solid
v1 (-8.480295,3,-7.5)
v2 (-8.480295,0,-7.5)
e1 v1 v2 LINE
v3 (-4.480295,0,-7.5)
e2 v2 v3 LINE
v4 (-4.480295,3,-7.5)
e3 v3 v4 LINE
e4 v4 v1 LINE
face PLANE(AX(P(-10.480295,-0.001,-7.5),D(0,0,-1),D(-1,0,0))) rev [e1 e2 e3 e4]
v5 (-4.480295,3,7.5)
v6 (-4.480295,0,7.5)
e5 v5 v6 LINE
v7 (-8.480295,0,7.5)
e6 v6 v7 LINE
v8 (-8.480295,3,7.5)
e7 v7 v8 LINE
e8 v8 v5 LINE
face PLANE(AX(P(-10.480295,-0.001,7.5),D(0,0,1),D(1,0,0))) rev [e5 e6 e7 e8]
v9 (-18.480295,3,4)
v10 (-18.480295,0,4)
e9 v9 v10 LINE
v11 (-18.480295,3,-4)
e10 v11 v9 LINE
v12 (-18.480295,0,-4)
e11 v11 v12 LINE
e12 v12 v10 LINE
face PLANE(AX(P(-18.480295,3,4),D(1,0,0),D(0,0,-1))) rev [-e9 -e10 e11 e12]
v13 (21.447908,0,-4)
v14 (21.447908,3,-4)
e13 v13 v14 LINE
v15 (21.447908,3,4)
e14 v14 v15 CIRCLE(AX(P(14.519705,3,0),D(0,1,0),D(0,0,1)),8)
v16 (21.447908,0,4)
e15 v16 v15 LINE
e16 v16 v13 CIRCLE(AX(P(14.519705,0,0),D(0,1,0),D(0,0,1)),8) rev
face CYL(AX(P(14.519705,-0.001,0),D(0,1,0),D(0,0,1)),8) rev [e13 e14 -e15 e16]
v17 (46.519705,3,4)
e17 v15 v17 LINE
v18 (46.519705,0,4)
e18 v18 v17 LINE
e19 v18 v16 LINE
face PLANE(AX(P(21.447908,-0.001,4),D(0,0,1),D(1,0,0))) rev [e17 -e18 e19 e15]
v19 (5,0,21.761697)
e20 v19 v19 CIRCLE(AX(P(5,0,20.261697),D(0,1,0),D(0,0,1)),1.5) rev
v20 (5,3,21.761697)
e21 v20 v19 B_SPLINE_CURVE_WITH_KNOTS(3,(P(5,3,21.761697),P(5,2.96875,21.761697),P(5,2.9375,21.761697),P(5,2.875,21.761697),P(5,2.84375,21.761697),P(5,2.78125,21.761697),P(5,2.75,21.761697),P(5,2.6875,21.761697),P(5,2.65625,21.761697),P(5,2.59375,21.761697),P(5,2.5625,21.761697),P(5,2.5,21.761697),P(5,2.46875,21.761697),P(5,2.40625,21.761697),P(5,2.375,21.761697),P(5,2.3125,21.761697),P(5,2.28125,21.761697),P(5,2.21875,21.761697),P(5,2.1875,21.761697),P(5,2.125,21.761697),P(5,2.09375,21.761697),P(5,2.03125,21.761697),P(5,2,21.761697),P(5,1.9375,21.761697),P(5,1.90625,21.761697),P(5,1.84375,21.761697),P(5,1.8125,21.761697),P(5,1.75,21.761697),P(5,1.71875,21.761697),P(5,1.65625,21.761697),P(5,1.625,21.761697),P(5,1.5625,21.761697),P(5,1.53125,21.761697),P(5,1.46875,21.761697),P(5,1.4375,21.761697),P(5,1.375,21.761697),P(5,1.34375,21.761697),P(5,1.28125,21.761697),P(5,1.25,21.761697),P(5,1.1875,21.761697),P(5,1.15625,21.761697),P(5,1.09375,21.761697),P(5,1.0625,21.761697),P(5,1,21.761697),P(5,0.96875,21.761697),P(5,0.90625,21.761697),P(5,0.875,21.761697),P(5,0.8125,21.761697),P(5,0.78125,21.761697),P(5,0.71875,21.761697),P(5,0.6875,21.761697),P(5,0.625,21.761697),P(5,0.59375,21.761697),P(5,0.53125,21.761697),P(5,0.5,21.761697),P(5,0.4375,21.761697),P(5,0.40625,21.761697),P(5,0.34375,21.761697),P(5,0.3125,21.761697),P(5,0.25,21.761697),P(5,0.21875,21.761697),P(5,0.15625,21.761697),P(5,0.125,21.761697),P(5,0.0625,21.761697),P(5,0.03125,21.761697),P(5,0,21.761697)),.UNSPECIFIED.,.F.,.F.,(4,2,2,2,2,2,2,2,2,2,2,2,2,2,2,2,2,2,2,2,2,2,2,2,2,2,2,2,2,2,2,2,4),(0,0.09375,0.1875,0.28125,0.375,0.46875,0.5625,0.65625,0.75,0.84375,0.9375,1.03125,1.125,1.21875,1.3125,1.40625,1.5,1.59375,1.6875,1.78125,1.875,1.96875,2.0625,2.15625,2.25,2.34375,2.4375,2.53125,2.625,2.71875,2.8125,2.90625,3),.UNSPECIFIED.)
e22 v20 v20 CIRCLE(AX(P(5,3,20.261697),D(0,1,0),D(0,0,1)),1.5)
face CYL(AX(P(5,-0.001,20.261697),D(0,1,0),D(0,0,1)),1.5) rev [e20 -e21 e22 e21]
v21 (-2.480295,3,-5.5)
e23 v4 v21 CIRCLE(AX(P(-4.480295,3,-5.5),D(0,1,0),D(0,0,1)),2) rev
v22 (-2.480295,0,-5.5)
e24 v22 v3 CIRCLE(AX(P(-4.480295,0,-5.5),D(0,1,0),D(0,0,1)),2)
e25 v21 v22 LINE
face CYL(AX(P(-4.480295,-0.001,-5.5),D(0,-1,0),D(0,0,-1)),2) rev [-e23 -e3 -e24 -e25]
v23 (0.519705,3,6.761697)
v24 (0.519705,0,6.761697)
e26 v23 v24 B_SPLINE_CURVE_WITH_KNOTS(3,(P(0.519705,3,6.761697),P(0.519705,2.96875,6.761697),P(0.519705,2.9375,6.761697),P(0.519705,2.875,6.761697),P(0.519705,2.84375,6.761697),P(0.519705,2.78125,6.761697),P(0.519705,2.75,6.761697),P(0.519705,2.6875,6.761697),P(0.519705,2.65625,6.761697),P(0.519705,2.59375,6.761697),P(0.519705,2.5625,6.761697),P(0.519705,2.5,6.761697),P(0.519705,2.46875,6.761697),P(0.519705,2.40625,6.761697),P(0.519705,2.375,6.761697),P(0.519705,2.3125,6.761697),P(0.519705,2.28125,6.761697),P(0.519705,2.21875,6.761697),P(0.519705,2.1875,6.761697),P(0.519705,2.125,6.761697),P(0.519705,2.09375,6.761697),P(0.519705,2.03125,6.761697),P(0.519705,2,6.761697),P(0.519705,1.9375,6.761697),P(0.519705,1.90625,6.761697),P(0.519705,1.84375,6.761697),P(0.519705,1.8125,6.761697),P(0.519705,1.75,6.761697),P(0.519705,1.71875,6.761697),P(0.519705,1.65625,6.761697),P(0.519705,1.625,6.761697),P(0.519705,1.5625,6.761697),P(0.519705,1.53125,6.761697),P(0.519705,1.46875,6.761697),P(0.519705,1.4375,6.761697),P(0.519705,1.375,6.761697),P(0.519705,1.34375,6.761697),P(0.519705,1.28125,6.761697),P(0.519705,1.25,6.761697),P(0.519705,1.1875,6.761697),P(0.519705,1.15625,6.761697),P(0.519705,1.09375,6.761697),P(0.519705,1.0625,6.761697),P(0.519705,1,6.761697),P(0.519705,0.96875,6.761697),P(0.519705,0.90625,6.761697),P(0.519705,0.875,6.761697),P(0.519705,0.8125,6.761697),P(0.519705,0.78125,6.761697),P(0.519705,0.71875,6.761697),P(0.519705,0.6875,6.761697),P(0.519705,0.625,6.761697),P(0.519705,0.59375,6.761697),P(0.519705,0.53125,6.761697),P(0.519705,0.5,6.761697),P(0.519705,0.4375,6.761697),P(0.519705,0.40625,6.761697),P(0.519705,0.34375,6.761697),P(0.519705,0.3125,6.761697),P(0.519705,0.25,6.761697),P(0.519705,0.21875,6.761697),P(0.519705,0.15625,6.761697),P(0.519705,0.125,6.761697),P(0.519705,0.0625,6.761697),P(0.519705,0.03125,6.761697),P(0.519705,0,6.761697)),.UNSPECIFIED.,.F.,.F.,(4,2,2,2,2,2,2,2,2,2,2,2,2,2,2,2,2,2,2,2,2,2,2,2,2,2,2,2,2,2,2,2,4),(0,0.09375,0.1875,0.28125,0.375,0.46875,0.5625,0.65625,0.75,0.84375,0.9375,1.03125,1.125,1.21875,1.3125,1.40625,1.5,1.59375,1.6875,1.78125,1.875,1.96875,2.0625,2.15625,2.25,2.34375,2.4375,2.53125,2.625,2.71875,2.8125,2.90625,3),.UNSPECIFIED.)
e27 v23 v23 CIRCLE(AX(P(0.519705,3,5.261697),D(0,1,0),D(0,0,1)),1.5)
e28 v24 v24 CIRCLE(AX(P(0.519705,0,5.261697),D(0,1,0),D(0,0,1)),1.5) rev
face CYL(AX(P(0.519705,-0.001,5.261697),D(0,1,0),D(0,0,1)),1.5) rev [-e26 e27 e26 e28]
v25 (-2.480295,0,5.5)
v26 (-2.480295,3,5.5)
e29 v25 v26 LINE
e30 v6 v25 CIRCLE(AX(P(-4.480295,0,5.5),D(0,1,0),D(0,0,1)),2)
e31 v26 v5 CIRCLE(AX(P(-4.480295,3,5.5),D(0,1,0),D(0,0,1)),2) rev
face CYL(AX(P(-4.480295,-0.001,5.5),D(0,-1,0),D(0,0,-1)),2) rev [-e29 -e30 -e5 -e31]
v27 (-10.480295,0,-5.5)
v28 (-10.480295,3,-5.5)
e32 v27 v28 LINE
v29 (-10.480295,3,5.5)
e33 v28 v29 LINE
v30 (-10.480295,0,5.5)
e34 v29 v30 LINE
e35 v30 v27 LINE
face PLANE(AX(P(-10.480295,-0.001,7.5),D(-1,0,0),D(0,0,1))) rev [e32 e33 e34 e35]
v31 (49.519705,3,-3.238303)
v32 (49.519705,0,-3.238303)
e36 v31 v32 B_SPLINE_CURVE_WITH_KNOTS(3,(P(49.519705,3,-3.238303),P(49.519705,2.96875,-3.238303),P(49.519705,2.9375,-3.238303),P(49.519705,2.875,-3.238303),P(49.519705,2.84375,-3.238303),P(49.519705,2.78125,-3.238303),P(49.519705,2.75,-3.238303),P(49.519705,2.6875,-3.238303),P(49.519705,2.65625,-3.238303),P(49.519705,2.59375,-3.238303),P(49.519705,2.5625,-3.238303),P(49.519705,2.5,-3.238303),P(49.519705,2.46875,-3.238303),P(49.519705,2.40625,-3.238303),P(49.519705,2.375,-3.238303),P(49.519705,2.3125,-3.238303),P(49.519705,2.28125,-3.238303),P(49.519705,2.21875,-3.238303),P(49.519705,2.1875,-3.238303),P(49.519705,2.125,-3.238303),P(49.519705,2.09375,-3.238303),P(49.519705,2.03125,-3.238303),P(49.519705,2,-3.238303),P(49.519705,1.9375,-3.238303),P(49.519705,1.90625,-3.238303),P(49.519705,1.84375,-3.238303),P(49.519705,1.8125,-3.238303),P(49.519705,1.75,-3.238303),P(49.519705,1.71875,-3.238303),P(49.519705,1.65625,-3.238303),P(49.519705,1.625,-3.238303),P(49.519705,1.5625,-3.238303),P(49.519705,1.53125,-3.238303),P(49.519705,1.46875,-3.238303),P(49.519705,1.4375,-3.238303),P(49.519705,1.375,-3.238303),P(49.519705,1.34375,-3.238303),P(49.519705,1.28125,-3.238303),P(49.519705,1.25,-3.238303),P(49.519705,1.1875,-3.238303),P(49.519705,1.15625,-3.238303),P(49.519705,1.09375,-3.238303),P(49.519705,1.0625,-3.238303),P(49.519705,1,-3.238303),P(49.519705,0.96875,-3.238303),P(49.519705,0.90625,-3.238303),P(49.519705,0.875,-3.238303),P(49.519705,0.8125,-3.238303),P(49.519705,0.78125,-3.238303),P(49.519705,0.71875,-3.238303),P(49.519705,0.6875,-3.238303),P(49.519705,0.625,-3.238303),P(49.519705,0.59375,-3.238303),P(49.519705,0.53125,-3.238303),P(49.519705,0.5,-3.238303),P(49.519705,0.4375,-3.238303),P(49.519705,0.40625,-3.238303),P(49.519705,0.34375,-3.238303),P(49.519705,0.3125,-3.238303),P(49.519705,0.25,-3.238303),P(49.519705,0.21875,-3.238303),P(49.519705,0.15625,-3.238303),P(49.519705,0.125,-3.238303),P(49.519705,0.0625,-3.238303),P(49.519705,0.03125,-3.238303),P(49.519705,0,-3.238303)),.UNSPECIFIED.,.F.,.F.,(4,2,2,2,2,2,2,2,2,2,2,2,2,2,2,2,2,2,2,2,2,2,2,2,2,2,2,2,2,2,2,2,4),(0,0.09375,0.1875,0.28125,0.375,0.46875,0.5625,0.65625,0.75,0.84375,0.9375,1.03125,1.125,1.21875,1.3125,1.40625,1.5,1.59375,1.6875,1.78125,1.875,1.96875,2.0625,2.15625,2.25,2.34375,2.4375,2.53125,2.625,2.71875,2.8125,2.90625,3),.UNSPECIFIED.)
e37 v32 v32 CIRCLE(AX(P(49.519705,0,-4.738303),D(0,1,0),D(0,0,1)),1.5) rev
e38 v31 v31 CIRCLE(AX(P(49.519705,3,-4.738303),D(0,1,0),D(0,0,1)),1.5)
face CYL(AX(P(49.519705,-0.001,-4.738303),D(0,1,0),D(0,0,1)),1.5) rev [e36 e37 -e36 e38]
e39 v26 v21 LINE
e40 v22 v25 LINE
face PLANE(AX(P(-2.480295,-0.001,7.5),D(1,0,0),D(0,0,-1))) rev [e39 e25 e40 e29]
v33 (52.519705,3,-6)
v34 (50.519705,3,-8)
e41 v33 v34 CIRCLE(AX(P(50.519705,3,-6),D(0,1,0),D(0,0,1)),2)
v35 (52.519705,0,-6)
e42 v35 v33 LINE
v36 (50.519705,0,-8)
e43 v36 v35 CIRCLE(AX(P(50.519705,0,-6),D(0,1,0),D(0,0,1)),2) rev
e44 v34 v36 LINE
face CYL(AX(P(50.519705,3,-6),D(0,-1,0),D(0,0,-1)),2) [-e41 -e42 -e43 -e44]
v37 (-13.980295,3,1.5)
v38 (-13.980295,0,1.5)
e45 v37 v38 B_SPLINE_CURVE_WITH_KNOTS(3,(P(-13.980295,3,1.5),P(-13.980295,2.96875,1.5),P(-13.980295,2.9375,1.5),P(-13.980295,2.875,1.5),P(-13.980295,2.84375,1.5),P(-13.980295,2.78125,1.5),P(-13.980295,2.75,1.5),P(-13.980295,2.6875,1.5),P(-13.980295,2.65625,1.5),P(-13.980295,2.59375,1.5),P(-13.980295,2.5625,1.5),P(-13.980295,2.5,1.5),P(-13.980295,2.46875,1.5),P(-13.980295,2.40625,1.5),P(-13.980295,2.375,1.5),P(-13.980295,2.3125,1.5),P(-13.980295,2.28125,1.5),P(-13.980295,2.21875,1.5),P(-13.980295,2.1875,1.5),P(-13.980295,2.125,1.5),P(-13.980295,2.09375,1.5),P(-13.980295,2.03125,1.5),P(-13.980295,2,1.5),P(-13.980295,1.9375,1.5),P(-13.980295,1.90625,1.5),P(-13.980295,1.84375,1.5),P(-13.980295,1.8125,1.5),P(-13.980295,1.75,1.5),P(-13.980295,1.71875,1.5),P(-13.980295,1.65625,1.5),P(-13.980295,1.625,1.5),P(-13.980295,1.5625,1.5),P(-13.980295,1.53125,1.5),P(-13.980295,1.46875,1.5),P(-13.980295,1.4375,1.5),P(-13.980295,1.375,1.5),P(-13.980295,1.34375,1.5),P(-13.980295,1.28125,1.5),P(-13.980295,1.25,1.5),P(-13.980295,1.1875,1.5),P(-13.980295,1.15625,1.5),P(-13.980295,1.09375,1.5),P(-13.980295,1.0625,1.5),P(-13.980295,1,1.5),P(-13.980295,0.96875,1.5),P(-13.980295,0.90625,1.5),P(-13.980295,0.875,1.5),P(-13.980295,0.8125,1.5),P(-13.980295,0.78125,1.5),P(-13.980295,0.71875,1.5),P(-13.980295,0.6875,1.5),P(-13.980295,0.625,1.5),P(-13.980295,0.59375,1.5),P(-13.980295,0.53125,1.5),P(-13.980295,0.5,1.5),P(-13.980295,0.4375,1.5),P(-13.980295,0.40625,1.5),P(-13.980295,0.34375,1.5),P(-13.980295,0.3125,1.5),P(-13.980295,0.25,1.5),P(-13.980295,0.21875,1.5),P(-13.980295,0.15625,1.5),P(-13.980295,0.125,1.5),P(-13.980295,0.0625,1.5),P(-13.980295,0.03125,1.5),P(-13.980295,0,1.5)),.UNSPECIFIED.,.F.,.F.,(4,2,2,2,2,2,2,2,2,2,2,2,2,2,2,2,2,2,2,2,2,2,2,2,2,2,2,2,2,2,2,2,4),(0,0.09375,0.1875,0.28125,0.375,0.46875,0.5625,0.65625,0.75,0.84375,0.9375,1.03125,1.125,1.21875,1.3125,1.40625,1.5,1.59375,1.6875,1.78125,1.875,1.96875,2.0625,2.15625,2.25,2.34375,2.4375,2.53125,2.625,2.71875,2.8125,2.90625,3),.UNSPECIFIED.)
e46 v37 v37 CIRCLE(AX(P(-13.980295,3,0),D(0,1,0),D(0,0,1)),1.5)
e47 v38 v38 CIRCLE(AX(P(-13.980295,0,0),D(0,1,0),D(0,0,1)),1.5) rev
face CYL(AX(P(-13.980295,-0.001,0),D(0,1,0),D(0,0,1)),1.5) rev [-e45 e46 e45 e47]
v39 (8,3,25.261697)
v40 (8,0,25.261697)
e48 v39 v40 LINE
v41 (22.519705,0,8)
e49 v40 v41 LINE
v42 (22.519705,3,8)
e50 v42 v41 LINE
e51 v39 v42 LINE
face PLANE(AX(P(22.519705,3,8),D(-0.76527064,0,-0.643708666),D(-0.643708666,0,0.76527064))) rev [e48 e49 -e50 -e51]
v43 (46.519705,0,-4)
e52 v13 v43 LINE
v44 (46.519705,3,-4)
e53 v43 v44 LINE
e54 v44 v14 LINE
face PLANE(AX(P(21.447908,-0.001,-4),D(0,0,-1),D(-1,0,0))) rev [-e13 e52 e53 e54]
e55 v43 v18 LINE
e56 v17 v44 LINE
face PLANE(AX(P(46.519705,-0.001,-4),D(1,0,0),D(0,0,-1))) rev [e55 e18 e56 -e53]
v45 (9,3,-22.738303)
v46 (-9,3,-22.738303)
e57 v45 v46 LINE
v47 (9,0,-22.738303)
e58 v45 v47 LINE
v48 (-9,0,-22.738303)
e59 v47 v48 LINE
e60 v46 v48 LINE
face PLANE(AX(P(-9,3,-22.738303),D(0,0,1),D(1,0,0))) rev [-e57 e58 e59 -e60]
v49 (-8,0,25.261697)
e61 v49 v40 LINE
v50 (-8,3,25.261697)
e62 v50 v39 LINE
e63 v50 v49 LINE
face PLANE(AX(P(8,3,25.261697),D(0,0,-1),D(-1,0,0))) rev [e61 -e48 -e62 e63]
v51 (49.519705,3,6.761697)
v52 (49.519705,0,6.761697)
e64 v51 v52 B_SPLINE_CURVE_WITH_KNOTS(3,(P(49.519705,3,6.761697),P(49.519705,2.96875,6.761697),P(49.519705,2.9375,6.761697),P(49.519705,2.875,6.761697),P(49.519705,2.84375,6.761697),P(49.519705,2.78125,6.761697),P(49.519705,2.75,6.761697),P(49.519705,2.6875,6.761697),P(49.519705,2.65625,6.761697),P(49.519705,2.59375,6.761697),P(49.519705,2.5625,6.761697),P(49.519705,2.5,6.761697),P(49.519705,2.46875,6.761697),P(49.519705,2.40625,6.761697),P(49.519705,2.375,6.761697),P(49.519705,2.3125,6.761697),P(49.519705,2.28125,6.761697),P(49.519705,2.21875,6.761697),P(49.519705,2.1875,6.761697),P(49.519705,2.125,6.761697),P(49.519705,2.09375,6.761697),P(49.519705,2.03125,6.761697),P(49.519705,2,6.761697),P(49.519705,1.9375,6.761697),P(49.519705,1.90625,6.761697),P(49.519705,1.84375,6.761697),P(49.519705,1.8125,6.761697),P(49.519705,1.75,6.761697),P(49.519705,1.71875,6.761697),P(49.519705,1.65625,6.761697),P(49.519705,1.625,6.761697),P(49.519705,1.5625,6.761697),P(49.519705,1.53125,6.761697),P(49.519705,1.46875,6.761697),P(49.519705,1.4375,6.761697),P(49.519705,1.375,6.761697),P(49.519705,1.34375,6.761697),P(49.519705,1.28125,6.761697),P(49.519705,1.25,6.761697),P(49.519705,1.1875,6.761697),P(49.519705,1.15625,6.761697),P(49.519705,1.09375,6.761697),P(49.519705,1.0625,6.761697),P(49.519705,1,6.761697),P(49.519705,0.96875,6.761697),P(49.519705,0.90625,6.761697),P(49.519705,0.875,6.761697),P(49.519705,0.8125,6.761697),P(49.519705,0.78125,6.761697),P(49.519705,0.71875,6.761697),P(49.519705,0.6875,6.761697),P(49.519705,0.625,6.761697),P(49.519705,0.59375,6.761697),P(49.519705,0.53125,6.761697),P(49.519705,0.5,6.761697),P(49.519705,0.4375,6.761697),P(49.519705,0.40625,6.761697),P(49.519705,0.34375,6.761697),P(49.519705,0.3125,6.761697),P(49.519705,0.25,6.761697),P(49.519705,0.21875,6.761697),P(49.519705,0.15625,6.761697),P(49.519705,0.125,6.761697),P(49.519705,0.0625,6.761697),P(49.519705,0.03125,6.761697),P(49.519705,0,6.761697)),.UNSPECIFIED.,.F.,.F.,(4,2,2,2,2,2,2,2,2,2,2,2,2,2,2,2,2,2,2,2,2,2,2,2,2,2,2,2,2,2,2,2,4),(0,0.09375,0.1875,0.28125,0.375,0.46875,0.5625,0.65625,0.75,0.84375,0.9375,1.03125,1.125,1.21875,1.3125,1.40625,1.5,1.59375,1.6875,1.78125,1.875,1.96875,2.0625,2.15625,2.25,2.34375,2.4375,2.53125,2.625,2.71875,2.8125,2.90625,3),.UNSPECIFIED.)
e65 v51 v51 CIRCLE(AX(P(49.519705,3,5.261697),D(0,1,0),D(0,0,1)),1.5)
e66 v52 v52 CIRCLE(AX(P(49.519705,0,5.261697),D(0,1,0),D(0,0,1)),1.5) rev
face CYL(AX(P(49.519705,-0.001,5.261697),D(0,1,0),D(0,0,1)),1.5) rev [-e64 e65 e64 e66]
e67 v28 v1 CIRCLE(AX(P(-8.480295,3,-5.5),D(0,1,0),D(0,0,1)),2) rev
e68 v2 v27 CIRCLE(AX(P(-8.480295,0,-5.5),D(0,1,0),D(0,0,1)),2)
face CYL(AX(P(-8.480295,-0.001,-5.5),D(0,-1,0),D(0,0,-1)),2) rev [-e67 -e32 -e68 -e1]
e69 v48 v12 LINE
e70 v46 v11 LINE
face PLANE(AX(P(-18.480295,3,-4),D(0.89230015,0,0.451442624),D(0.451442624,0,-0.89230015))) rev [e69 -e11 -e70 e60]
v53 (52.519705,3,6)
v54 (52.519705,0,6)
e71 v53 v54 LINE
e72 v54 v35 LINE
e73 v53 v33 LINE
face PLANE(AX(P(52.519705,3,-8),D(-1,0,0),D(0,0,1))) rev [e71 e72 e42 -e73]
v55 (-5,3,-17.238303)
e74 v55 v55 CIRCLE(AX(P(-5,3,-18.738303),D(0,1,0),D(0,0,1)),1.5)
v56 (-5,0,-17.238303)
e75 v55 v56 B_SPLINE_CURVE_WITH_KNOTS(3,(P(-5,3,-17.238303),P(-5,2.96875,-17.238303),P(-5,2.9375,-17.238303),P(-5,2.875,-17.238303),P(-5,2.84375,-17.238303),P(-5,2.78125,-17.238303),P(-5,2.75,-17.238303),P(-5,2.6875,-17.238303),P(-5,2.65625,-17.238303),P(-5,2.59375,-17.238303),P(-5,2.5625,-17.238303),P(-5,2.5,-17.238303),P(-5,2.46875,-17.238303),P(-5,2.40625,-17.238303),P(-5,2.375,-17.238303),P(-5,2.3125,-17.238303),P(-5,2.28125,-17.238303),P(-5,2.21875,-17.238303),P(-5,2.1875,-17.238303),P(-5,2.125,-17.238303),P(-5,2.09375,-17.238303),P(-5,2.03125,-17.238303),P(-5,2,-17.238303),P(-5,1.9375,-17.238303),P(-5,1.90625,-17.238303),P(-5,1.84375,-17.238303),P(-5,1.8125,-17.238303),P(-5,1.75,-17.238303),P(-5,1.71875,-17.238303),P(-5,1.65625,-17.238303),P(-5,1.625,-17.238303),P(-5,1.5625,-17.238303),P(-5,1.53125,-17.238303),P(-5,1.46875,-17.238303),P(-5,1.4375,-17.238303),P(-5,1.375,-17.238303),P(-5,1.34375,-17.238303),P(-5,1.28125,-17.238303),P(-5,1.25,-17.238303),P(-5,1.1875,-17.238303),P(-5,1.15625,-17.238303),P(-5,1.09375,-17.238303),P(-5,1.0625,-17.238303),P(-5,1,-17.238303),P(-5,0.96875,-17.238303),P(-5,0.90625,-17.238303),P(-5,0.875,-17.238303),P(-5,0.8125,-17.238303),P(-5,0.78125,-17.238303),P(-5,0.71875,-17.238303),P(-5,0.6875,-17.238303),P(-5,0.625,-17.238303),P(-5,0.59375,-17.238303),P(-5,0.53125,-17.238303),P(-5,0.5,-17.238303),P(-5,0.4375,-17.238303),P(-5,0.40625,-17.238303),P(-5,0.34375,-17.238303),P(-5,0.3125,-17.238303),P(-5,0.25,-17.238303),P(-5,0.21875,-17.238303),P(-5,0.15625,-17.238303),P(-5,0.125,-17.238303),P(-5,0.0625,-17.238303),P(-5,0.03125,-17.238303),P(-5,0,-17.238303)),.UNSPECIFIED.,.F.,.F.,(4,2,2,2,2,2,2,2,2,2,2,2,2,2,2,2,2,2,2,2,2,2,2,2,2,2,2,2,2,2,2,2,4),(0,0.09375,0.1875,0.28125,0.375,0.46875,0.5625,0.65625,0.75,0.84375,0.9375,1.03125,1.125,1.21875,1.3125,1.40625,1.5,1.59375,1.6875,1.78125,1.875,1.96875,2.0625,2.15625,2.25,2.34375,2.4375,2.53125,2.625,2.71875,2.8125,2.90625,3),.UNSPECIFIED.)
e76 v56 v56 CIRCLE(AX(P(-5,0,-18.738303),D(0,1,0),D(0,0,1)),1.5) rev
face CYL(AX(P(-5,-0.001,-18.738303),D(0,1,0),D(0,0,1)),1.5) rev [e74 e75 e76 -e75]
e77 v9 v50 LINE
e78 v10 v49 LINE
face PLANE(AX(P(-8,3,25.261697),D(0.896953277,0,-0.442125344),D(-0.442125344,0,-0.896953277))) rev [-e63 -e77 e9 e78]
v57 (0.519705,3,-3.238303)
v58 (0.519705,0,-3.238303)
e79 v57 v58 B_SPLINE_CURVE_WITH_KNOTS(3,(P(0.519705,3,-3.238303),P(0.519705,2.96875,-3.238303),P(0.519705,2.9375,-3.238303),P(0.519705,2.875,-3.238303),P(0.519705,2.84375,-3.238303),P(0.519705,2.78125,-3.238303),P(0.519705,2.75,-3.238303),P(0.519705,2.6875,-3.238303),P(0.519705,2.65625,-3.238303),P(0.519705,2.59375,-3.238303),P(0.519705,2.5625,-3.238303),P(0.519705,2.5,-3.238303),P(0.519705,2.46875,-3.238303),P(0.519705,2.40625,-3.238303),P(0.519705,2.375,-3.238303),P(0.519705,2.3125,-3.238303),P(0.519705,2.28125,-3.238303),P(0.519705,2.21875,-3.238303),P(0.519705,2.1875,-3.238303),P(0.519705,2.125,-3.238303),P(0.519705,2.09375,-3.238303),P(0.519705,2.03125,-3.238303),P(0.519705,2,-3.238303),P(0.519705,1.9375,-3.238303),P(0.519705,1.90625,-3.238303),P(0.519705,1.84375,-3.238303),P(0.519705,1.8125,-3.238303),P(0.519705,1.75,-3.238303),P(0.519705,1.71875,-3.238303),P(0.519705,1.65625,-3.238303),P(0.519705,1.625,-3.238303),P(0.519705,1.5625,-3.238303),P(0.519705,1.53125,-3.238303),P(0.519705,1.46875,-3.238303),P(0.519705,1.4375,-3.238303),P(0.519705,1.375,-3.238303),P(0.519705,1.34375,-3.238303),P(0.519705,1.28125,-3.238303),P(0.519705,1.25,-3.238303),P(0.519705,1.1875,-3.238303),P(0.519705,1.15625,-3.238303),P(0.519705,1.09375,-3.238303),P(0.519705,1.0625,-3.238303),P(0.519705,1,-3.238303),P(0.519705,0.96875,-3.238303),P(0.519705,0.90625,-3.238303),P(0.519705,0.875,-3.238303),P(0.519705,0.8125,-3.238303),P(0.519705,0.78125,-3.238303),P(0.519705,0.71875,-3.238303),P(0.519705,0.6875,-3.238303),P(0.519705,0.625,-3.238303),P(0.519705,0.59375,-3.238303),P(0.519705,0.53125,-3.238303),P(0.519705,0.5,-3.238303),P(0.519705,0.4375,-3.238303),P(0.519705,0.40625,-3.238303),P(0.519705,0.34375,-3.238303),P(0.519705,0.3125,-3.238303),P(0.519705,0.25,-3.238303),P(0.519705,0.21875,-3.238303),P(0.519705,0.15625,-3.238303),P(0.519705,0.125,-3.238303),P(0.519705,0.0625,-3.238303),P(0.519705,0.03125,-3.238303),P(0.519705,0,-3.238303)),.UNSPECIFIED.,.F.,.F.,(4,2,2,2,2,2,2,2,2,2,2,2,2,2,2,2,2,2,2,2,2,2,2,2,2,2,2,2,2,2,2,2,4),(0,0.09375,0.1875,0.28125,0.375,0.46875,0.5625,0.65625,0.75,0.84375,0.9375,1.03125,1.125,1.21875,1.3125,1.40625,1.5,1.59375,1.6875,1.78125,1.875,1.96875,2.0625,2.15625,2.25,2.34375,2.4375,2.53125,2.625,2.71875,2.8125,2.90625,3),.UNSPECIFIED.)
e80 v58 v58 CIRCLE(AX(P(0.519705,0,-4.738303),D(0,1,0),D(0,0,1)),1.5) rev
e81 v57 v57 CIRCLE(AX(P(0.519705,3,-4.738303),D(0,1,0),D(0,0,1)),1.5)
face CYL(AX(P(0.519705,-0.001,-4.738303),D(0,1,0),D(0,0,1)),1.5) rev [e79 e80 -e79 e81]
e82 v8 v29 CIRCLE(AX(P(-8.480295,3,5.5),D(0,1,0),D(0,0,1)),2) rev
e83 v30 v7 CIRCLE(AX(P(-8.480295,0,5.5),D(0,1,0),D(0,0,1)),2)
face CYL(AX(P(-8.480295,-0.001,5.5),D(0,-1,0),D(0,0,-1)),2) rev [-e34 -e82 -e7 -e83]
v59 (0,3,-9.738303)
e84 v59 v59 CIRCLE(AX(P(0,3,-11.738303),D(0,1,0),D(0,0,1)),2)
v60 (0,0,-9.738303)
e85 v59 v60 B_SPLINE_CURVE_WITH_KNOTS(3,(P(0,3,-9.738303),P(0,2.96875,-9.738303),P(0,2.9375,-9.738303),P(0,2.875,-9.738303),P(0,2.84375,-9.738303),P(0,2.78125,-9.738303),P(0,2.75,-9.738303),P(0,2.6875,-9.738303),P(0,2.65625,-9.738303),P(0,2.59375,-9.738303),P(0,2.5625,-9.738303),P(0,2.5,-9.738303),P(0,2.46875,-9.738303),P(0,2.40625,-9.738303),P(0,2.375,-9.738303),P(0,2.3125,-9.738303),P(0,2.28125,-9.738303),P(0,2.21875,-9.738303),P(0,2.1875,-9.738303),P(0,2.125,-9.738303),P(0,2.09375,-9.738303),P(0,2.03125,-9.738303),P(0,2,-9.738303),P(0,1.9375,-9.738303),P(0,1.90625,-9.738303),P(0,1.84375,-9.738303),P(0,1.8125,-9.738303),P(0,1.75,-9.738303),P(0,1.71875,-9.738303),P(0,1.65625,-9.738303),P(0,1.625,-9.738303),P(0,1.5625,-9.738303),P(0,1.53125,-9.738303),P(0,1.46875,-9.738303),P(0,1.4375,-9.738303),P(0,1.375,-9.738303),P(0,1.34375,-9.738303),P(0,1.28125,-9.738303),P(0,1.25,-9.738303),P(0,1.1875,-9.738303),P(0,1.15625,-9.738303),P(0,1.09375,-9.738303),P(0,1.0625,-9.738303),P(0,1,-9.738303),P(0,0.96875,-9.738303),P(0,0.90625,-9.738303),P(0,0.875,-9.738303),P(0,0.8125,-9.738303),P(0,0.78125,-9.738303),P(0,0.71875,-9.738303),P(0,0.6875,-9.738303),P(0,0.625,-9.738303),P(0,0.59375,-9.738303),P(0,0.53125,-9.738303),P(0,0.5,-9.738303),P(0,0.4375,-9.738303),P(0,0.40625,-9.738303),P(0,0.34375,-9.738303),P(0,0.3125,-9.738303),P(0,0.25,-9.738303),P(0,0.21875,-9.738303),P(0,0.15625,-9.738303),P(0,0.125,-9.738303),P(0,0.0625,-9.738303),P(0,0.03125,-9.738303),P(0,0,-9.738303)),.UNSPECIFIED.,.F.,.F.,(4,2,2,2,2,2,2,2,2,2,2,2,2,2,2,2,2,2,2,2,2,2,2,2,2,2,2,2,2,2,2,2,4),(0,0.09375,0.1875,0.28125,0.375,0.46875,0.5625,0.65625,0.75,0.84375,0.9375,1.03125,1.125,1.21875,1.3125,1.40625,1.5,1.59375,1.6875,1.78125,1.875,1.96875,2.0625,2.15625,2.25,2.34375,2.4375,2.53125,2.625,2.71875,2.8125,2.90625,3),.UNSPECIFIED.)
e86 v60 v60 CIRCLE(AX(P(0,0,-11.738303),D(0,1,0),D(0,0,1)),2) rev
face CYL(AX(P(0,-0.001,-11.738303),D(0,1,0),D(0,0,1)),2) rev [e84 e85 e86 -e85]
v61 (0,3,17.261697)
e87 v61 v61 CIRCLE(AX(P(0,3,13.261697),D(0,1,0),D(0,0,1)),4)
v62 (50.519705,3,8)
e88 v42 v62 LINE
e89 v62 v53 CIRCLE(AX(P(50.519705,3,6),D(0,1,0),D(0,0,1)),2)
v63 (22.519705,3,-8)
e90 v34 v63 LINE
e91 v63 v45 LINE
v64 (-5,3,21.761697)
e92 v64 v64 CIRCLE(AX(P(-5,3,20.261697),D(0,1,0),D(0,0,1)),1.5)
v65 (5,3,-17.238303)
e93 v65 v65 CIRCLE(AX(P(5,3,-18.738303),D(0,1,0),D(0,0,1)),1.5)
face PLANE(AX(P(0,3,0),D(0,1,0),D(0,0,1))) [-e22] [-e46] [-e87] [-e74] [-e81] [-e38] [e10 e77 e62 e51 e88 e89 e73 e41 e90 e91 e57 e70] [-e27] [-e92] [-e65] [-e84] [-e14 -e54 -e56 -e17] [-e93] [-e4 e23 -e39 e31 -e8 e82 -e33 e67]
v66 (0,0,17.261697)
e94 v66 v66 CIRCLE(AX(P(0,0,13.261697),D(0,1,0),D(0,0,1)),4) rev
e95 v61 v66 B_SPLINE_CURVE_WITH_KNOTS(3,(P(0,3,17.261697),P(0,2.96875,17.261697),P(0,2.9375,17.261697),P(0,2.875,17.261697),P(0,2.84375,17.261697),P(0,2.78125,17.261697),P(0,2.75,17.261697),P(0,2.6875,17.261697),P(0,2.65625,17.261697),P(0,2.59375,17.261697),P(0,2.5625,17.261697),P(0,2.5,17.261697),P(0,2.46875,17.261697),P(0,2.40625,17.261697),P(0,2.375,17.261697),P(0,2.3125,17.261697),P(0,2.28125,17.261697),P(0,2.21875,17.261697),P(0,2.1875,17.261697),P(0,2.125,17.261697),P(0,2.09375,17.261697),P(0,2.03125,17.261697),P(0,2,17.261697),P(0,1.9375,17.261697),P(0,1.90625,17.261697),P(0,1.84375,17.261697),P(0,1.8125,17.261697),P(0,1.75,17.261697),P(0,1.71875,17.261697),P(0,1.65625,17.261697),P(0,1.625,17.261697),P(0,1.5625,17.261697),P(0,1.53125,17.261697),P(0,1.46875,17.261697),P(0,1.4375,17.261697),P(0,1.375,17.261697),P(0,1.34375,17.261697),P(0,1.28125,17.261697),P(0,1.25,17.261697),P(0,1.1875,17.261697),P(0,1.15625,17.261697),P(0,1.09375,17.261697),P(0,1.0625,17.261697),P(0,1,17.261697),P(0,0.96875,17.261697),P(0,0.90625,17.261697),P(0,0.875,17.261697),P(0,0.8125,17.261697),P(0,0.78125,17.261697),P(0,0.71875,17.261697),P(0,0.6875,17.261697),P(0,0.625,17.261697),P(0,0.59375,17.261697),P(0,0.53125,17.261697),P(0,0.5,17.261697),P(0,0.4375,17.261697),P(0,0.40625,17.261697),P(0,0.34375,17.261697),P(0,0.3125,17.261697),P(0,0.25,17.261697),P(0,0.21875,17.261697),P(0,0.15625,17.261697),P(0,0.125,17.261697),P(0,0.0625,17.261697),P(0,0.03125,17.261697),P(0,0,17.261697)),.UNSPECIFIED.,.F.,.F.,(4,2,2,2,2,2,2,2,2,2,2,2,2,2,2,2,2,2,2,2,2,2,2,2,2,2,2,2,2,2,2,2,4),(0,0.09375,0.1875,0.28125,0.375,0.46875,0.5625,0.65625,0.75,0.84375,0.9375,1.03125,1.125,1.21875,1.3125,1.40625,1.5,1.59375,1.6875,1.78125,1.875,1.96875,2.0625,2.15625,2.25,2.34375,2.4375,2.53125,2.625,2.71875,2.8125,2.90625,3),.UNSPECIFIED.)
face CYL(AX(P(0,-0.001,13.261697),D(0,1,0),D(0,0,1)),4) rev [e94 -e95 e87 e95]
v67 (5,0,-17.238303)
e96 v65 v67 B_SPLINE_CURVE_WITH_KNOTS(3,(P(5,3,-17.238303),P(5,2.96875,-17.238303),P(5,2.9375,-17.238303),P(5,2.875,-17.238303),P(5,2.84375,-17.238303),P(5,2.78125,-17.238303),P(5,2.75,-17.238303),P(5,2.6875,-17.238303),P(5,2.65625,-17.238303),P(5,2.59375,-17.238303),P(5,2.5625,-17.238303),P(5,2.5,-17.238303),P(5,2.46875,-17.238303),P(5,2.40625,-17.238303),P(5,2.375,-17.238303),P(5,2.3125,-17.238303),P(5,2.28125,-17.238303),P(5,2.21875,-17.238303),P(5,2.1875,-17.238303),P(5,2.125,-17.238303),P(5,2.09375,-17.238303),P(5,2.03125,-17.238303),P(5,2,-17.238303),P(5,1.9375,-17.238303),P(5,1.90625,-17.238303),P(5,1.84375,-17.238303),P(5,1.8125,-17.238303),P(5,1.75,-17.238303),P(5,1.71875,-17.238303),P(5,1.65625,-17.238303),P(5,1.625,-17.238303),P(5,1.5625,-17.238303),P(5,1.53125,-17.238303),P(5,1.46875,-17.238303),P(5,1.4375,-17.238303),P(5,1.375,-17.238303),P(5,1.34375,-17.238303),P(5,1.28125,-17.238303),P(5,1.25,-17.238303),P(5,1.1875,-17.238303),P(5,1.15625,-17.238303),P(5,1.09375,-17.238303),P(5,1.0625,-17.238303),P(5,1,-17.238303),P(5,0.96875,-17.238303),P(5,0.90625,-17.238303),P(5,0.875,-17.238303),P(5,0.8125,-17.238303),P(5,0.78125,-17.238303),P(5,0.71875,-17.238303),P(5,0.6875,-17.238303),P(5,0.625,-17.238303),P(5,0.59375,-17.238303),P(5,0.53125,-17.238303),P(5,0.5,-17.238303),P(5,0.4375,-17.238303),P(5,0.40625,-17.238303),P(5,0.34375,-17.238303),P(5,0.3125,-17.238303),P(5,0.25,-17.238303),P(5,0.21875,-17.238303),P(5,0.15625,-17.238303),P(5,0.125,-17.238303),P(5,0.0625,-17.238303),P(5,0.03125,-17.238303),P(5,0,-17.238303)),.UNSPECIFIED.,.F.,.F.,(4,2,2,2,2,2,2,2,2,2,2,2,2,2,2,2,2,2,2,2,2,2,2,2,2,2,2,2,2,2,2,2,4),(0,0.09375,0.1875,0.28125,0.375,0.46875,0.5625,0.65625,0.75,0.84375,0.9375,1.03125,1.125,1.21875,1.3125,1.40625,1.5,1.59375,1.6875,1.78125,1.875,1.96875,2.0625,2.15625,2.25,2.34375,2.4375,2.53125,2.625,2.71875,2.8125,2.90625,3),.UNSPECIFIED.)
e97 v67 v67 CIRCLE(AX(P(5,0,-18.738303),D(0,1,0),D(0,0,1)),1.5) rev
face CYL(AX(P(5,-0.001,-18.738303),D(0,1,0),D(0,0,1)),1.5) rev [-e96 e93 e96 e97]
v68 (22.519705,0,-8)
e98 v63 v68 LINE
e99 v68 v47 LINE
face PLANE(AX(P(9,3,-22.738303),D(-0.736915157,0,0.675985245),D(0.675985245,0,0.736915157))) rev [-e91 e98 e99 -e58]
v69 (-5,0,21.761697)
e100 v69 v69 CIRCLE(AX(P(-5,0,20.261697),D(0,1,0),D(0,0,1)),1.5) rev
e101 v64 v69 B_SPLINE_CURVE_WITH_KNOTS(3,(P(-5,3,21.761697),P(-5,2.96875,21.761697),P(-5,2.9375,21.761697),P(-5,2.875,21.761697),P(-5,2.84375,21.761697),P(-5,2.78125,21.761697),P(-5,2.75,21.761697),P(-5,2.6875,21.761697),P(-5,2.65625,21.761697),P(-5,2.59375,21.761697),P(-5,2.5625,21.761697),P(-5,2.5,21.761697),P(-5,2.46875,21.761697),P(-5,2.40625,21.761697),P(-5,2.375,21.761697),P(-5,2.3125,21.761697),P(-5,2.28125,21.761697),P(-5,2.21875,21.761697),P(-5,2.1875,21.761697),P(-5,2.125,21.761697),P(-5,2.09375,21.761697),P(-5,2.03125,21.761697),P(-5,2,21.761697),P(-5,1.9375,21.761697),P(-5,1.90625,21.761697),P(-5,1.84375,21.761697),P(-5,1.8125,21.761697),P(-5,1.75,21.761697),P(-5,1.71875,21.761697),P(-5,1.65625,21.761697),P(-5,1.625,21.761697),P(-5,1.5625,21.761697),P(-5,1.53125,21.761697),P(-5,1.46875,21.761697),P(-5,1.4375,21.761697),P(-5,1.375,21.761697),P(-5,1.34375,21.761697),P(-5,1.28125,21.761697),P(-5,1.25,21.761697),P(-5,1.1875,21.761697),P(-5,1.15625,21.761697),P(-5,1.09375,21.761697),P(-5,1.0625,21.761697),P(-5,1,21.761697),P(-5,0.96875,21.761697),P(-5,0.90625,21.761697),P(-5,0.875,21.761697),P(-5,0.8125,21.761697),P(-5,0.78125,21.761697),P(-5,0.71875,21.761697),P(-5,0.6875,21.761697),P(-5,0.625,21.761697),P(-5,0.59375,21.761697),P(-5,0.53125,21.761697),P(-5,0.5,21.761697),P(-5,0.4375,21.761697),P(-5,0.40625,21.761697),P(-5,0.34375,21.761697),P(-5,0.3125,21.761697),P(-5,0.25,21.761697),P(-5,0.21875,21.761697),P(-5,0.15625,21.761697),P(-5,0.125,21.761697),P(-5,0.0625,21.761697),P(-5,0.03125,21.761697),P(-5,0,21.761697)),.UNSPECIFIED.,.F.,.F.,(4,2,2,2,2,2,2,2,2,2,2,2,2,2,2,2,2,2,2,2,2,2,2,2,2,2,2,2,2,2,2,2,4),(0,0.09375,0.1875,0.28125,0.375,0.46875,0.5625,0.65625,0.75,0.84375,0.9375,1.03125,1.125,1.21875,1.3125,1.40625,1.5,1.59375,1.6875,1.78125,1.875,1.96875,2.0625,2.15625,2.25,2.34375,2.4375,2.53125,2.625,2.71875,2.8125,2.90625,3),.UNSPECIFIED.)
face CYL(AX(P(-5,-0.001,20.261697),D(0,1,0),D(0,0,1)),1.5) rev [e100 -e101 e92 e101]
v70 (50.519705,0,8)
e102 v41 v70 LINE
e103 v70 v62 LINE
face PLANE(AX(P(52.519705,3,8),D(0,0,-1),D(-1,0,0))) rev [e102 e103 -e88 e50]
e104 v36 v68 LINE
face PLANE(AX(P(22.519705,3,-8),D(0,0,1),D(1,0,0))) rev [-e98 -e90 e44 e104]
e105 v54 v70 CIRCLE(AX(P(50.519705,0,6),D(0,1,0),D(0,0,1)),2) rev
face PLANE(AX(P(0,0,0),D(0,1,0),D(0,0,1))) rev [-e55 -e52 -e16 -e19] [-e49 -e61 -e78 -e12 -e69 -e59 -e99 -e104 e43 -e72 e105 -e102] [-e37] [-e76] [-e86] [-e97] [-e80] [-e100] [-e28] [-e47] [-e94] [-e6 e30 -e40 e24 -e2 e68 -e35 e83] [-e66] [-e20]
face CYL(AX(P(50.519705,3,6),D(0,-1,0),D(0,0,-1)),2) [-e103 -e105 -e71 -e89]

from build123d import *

# Parameters (mm, degrees)
BASE_FLANGE1_DEPTH = 3
CUT_EXTRUDE1_REACH = 60.356
CUT_EXTRUDE2_REACH = 60.356
SKETCH3_R          = 1.5
SKETCH3_W          = 8
SKETCH3_H          = 15
CUT_EXTRUDE3_REACH = 60.356
SKETCH4_R          = 1.5
CUT_EXTRUDE4_REACH = 60.356
SKETCH5_R          = 2
SKETCH5_R_2        = 4
FILLET1_R          = 2


# Sheet-metal steps are written as plain solids
with BuildPart() as part:
    # Sketch1 → Base-Flange1 (new body)
    with BuildSketch(Plane(origin=(0, 0, 0), x_dir=(1, 0, 0), z_dir=(0, 1, 0))):
        Polygon((-18.480295105, -4), (-18.480295105, 4), (-9, 22.738303144), (9, 22.738303144), (22.519704895, 8), (52.519704895, 8), (52.519704895, -8), (22.519704895, -8), (8, -25.261696856), (-8, -25.261696856), align=None)
    extrude(amount=BASE_FLANGE1_DEPTH)

    # Sketch2 → Cut-Extrude1 (cut, up to next)
    with BuildSketch(Plane(origin=(0, 3, 0), x_dir=(1, 0, 0), z_dir=(0, 1, 0)), mode=Mode.PRIVATE) as cut_extrude1_sk1:
        with BuildLine():
            Line((21.447908125, 4), (46.519704895, 4))
            Line((46.519704895, 4), (46.519704895, -4))
            Line((46.519704895, -4), (21.447908125, -4))
            ThreePointArc((21.447908125, -4), (6.519704895, 0), (21.447908125, 4))
        make_face()
    cut_extrude1_tool1 = extrude(cut_extrude1_sk1.sketch, amount=-CUT_EXTRUDE1_REACH, mode=Mode.PRIVATE) & part.part
    add(cut_extrude1_tool1.solids().sort_by_distance((24.274518, 3, 0))[0], mode=Mode.SUBTRACT)

    # Sketch3 → Cut-Extrude2 (cut, up to next)
    with BuildSketch(Plane(origin=(0, 3, 0), x_dir=(1, 0, 0), z_dir=(0, 1, 0)), mode=Mode.PRIVATE) as cut_extrude2_sk1:
        with Locations(Location((-13.980295105, 0, 0), (0, 0, 270))):
            Circle(SKETCH3_R)
    cut_extrude2_tool1 = extrude(cut_extrude2_sk1.sketch, amount=-CUT_EXTRUDE2_REACH, mode=Mode.PRIVATE) & part.part
    # Sketch3 → Cut-Extrude2 (cut, up to next)
    with BuildSketch(Plane(origin=(0, 3, 0), x_dir=(1, 0, 0), z_dir=(0, 1, 0)), mode=Mode.PRIVATE) as cut_extrude2_sk2:
        with Locations((-6.480295105, 0)):
            Rectangle(SKETCH3_W, SKETCH3_H)
    cut_extrude2_tool2 = extrude(cut_extrude2_sk2.sketch, amount=-CUT_EXTRUDE2_REACH, mode=Mode.PRIVATE) & part.part
    add(cut_extrude2_tool1.solids().sort_by_distance((-13.980295, 3, 0))[0], mode=Mode.SUBTRACT)
    add(cut_extrude2_tool2.solids().sort_by_distance((-6.480295, 3, 0))[0], mode=Mode.SUBTRACT)

    # Sketch4 → Cut-Extrude3 (cut, up to next)
    with BuildSketch(Plane(origin=(0, 3, 0), x_dir=(1, 0, 0), z_dir=(0, 1, 0)), mode=Mode.PRIVATE) as cut_extrude3_sk1:
        with Locations(Location((-5, 18.738303144, 0), (0, 0, 270))):
            Circle(SKETCH4_R)
    cut_extrude3_tool1 = extrude(cut_extrude3_sk1.sketch, amount=-CUT_EXTRUDE3_REACH, mode=Mode.PRIVATE) & part.part
    # Sketch4 → Cut-Extrude3 (cut, up to next)
    with BuildSketch(Plane(origin=(0, 3, 0), x_dir=(1, 0, 0), z_dir=(0, 1, 0)), mode=Mode.PRIVATE) as cut_extrude3_sk2:
        with Locations(Location((5, 18.738303144, 0), (0, 0, 270))):
            Circle(SKETCH4_R)
    cut_extrude3_tool2 = extrude(cut_extrude3_sk2.sketch, amount=-CUT_EXTRUDE3_REACH, mode=Mode.PRIVATE) & part.part
    # Sketch4 → Cut-Extrude3 (cut, up to next)
    with BuildSketch(Plane(origin=(0, 3, 0), x_dir=(1, 0, 0), z_dir=(0, 1, 0)), mode=Mode.PRIVATE) as cut_extrude3_sk3:
        with Locations(Location((0.519704895, 4.738303144, 0), (0, 0, 270))):
            Circle(SKETCH4_R)
    cut_extrude3_tool3 = extrude(cut_extrude3_sk3.sketch, amount=-CUT_EXTRUDE3_REACH, mode=Mode.PRIVATE) & part.part
    # Sketch4 → Cut-Extrude3 (cut, up to next)
    with BuildSketch(Plane(origin=(0, 3, 0), x_dir=(1, 0, 0), z_dir=(0, 1, 0)), mode=Mode.PRIVATE) as cut_extrude3_sk4:
        with Locations(Location((-5, -20.261696856, 0), (0, 0, 270))):
            Circle(SKETCH4_R)
    cut_extrude3_tool4 = extrude(cut_extrude3_sk4.sketch, amount=-CUT_EXTRUDE3_REACH, mode=Mode.PRIVATE) & part.part
    # Sketch4 → Cut-Extrude3 (cut, up to next)
    with BuildSketch(Plane(origin=(0, 3, 0), x_dir=(1, 0, 0), z_dir=(0, 1, 0)), mode=Mode.PRIVATE) as cut_extrude3_sk5:
        with Locations(Location((5, -20.261696856, 0), (0, 0, 270))):
            Circle(SKETCH4_R)
    cut_extrude3_tool5 = extrude(cut_extrude3_sk5.sketch, amount=-CUT_EXTRUDE3_REACH, mode=Mode.PRIVATE) & part.part
    # Sketch4 → Cut-Extrude3 (cut, up to next)
    with BuildSketch(Plane(origin=(0, 3, 0), x_dir=(1, 0, 0), z_dir=(0, 1, 0)), mode=Mode.PRIVATE) as cut_extrude3_sk6:
        with Locations(Location((0.519704895, -5.261696856, 0), (0, 0, 270))):
            Circle(SKETCH4_R)
    cut_extrude3_tool6 = extrude(cut_extrude3_sk6.sketch, amount=-CUT_EXTRUDE3_REACH, mode=Mode.PRIVATE) & part.part
    # Sketch4 → Cut-Extrude3 (cut, up to next)
    with BuildSketch(Plane(origin=(0, 3, 0), x_dir=(1, 0, 0), z_dir=(0, 1, 0)), mode=Mode.PRIVATE) as cut_extrude3_sk7:
        with Locations(Location((49.519704895, 4.738303144, 0), (0, 0, 270))):
            Circle(SKETCH4_R)
    cut_extrude3_tool7 = extrude(cut_extrude3_sk7.sketch, amount=-CUT_EXTRUDE3_REACH, mode=Mode.PRIVATE) & part.part
    # Sketch4 → Cut-Extrude3 (cut, up to next)
    with BuildSketch(Plane(origin=(0, 3, 0), x_dir=(1, 0, 0), z_dir=(0, 1, 0)), mode=Mode.PRIVATE) as cut_extrude3_sk8:
        with Locations(Location((49.519704895, -5.261696856, 0), (0, 0, 270))):
            Circle(SKETCH4_R)
    cut_extrude3_tool8 = extrude(cut_extrude3_sk8.sketch, amount=-CUT_EXTRUDE3_REACH, mode=Mode.PRIVATE) & part.part
    add(cut_extrude3_tool1.solids().sort_by_distance((-5, 3, -18.738303))[0], mode=Mode.SUBTRACT)
    add(cut_extrude3_tool2.solids().sort_by_distance((5, 3, -18.738303))[0], mode=Mode.SUBTRACT)
    add(cut_extrude3_tool3.solids().sort_by_distance((0.519705, 3, -4.738303))[0], mode=Mode.SUBTRACT)
    add(cut_extrude3_tool4.solids().sort_by_distance((-5, 3, 20.261697))[0], mode=Mode.SUBTRACT)
    add(cut_extrude3_tool5.solids().sort_by_distance((5, 3, 20.261697))[0], mode=Mode.SUBTRACT)
    add(cut_extrude3_tool6.solids().sort_by_distance((0.519705, 3, 5.261697))[0], mode=Mode.SUBTRACT)
    add(cut_extrude3_tool7.solids().sort_by_distance((49.519705, 3, -4.738303))[0], mode=Mode.SUBTRACT)
    add(cut_extrude3_tool8.solids().sort_by_distance((49.519705, 3, 5.261697))[0], mode=Mode.SUBTRACT)

    # Sketch5 → Cut-Extrude4 (cut, up to next)
    with BuildSketch(Plane(origin=(0, 3, 0), x_dir=(1, 0, 0), z_dir=(0, 1, 0)), mode=Mode.PRIVATE) as cut_extrude4_sk1:
        with Locations(Location((0, 11.738303144, 0), (0, 0, 270))):
            Circle(SKETCH5_R)
    cut_extrude4_tool1 = extrude(cut_extrude4_sk1.sketch, amount=-CUT_EXTRUDE4_REACH, mode=Mode.PRIVATE) & part.part
    # Sketch5 → Cut-Extrude4 (cut, up to next)
    with BuildSketch(Plane(origin=(0, 3, 0), x_dir=(1, 0, 0), z_dir=(0, 1, 0)), mode=Mode.PRIVATE) as cut_extrude4_sk2:
        with Locations(Location((0, -13.261696856, 0), (0, 0, 270))):
            Circle(SKETCH5_R_2)
    cut_extrude4_tool2 = extrude(cut_extrude4_sk2.sketch, amount=-CUT_EXTRUDE4_REACH, mode=Mode.PRIVATE) & part.part
    add(cut_extrude4_tool1.solids().sort_by_distance((0, 3, -11.738303))[0], mode=Mode.SUBTRACT)
    add(cut_extrude4_tool2.solids().sort_by_distance((0, 3, 13.261697))[0], mode=Mode.SUBTRACT)

    # Fillet1
    fillet1_edges = [part.edges().sort_by_distance(p)[0] for p in [
        (52.519704895, 1.5, -8),
        (52.519704895, 1.5, 8),
        (-2.480295105, 1.5, -7.5),
        (-2.480295105, 1.5, 7.5),
        (-10.480295105, 1.5, 7.5),
        (-10.480295105, 1.5, -7.5),
    ]]
    fillet(fillet1_edges, radius=FILLET1_R)


solid = part.part
